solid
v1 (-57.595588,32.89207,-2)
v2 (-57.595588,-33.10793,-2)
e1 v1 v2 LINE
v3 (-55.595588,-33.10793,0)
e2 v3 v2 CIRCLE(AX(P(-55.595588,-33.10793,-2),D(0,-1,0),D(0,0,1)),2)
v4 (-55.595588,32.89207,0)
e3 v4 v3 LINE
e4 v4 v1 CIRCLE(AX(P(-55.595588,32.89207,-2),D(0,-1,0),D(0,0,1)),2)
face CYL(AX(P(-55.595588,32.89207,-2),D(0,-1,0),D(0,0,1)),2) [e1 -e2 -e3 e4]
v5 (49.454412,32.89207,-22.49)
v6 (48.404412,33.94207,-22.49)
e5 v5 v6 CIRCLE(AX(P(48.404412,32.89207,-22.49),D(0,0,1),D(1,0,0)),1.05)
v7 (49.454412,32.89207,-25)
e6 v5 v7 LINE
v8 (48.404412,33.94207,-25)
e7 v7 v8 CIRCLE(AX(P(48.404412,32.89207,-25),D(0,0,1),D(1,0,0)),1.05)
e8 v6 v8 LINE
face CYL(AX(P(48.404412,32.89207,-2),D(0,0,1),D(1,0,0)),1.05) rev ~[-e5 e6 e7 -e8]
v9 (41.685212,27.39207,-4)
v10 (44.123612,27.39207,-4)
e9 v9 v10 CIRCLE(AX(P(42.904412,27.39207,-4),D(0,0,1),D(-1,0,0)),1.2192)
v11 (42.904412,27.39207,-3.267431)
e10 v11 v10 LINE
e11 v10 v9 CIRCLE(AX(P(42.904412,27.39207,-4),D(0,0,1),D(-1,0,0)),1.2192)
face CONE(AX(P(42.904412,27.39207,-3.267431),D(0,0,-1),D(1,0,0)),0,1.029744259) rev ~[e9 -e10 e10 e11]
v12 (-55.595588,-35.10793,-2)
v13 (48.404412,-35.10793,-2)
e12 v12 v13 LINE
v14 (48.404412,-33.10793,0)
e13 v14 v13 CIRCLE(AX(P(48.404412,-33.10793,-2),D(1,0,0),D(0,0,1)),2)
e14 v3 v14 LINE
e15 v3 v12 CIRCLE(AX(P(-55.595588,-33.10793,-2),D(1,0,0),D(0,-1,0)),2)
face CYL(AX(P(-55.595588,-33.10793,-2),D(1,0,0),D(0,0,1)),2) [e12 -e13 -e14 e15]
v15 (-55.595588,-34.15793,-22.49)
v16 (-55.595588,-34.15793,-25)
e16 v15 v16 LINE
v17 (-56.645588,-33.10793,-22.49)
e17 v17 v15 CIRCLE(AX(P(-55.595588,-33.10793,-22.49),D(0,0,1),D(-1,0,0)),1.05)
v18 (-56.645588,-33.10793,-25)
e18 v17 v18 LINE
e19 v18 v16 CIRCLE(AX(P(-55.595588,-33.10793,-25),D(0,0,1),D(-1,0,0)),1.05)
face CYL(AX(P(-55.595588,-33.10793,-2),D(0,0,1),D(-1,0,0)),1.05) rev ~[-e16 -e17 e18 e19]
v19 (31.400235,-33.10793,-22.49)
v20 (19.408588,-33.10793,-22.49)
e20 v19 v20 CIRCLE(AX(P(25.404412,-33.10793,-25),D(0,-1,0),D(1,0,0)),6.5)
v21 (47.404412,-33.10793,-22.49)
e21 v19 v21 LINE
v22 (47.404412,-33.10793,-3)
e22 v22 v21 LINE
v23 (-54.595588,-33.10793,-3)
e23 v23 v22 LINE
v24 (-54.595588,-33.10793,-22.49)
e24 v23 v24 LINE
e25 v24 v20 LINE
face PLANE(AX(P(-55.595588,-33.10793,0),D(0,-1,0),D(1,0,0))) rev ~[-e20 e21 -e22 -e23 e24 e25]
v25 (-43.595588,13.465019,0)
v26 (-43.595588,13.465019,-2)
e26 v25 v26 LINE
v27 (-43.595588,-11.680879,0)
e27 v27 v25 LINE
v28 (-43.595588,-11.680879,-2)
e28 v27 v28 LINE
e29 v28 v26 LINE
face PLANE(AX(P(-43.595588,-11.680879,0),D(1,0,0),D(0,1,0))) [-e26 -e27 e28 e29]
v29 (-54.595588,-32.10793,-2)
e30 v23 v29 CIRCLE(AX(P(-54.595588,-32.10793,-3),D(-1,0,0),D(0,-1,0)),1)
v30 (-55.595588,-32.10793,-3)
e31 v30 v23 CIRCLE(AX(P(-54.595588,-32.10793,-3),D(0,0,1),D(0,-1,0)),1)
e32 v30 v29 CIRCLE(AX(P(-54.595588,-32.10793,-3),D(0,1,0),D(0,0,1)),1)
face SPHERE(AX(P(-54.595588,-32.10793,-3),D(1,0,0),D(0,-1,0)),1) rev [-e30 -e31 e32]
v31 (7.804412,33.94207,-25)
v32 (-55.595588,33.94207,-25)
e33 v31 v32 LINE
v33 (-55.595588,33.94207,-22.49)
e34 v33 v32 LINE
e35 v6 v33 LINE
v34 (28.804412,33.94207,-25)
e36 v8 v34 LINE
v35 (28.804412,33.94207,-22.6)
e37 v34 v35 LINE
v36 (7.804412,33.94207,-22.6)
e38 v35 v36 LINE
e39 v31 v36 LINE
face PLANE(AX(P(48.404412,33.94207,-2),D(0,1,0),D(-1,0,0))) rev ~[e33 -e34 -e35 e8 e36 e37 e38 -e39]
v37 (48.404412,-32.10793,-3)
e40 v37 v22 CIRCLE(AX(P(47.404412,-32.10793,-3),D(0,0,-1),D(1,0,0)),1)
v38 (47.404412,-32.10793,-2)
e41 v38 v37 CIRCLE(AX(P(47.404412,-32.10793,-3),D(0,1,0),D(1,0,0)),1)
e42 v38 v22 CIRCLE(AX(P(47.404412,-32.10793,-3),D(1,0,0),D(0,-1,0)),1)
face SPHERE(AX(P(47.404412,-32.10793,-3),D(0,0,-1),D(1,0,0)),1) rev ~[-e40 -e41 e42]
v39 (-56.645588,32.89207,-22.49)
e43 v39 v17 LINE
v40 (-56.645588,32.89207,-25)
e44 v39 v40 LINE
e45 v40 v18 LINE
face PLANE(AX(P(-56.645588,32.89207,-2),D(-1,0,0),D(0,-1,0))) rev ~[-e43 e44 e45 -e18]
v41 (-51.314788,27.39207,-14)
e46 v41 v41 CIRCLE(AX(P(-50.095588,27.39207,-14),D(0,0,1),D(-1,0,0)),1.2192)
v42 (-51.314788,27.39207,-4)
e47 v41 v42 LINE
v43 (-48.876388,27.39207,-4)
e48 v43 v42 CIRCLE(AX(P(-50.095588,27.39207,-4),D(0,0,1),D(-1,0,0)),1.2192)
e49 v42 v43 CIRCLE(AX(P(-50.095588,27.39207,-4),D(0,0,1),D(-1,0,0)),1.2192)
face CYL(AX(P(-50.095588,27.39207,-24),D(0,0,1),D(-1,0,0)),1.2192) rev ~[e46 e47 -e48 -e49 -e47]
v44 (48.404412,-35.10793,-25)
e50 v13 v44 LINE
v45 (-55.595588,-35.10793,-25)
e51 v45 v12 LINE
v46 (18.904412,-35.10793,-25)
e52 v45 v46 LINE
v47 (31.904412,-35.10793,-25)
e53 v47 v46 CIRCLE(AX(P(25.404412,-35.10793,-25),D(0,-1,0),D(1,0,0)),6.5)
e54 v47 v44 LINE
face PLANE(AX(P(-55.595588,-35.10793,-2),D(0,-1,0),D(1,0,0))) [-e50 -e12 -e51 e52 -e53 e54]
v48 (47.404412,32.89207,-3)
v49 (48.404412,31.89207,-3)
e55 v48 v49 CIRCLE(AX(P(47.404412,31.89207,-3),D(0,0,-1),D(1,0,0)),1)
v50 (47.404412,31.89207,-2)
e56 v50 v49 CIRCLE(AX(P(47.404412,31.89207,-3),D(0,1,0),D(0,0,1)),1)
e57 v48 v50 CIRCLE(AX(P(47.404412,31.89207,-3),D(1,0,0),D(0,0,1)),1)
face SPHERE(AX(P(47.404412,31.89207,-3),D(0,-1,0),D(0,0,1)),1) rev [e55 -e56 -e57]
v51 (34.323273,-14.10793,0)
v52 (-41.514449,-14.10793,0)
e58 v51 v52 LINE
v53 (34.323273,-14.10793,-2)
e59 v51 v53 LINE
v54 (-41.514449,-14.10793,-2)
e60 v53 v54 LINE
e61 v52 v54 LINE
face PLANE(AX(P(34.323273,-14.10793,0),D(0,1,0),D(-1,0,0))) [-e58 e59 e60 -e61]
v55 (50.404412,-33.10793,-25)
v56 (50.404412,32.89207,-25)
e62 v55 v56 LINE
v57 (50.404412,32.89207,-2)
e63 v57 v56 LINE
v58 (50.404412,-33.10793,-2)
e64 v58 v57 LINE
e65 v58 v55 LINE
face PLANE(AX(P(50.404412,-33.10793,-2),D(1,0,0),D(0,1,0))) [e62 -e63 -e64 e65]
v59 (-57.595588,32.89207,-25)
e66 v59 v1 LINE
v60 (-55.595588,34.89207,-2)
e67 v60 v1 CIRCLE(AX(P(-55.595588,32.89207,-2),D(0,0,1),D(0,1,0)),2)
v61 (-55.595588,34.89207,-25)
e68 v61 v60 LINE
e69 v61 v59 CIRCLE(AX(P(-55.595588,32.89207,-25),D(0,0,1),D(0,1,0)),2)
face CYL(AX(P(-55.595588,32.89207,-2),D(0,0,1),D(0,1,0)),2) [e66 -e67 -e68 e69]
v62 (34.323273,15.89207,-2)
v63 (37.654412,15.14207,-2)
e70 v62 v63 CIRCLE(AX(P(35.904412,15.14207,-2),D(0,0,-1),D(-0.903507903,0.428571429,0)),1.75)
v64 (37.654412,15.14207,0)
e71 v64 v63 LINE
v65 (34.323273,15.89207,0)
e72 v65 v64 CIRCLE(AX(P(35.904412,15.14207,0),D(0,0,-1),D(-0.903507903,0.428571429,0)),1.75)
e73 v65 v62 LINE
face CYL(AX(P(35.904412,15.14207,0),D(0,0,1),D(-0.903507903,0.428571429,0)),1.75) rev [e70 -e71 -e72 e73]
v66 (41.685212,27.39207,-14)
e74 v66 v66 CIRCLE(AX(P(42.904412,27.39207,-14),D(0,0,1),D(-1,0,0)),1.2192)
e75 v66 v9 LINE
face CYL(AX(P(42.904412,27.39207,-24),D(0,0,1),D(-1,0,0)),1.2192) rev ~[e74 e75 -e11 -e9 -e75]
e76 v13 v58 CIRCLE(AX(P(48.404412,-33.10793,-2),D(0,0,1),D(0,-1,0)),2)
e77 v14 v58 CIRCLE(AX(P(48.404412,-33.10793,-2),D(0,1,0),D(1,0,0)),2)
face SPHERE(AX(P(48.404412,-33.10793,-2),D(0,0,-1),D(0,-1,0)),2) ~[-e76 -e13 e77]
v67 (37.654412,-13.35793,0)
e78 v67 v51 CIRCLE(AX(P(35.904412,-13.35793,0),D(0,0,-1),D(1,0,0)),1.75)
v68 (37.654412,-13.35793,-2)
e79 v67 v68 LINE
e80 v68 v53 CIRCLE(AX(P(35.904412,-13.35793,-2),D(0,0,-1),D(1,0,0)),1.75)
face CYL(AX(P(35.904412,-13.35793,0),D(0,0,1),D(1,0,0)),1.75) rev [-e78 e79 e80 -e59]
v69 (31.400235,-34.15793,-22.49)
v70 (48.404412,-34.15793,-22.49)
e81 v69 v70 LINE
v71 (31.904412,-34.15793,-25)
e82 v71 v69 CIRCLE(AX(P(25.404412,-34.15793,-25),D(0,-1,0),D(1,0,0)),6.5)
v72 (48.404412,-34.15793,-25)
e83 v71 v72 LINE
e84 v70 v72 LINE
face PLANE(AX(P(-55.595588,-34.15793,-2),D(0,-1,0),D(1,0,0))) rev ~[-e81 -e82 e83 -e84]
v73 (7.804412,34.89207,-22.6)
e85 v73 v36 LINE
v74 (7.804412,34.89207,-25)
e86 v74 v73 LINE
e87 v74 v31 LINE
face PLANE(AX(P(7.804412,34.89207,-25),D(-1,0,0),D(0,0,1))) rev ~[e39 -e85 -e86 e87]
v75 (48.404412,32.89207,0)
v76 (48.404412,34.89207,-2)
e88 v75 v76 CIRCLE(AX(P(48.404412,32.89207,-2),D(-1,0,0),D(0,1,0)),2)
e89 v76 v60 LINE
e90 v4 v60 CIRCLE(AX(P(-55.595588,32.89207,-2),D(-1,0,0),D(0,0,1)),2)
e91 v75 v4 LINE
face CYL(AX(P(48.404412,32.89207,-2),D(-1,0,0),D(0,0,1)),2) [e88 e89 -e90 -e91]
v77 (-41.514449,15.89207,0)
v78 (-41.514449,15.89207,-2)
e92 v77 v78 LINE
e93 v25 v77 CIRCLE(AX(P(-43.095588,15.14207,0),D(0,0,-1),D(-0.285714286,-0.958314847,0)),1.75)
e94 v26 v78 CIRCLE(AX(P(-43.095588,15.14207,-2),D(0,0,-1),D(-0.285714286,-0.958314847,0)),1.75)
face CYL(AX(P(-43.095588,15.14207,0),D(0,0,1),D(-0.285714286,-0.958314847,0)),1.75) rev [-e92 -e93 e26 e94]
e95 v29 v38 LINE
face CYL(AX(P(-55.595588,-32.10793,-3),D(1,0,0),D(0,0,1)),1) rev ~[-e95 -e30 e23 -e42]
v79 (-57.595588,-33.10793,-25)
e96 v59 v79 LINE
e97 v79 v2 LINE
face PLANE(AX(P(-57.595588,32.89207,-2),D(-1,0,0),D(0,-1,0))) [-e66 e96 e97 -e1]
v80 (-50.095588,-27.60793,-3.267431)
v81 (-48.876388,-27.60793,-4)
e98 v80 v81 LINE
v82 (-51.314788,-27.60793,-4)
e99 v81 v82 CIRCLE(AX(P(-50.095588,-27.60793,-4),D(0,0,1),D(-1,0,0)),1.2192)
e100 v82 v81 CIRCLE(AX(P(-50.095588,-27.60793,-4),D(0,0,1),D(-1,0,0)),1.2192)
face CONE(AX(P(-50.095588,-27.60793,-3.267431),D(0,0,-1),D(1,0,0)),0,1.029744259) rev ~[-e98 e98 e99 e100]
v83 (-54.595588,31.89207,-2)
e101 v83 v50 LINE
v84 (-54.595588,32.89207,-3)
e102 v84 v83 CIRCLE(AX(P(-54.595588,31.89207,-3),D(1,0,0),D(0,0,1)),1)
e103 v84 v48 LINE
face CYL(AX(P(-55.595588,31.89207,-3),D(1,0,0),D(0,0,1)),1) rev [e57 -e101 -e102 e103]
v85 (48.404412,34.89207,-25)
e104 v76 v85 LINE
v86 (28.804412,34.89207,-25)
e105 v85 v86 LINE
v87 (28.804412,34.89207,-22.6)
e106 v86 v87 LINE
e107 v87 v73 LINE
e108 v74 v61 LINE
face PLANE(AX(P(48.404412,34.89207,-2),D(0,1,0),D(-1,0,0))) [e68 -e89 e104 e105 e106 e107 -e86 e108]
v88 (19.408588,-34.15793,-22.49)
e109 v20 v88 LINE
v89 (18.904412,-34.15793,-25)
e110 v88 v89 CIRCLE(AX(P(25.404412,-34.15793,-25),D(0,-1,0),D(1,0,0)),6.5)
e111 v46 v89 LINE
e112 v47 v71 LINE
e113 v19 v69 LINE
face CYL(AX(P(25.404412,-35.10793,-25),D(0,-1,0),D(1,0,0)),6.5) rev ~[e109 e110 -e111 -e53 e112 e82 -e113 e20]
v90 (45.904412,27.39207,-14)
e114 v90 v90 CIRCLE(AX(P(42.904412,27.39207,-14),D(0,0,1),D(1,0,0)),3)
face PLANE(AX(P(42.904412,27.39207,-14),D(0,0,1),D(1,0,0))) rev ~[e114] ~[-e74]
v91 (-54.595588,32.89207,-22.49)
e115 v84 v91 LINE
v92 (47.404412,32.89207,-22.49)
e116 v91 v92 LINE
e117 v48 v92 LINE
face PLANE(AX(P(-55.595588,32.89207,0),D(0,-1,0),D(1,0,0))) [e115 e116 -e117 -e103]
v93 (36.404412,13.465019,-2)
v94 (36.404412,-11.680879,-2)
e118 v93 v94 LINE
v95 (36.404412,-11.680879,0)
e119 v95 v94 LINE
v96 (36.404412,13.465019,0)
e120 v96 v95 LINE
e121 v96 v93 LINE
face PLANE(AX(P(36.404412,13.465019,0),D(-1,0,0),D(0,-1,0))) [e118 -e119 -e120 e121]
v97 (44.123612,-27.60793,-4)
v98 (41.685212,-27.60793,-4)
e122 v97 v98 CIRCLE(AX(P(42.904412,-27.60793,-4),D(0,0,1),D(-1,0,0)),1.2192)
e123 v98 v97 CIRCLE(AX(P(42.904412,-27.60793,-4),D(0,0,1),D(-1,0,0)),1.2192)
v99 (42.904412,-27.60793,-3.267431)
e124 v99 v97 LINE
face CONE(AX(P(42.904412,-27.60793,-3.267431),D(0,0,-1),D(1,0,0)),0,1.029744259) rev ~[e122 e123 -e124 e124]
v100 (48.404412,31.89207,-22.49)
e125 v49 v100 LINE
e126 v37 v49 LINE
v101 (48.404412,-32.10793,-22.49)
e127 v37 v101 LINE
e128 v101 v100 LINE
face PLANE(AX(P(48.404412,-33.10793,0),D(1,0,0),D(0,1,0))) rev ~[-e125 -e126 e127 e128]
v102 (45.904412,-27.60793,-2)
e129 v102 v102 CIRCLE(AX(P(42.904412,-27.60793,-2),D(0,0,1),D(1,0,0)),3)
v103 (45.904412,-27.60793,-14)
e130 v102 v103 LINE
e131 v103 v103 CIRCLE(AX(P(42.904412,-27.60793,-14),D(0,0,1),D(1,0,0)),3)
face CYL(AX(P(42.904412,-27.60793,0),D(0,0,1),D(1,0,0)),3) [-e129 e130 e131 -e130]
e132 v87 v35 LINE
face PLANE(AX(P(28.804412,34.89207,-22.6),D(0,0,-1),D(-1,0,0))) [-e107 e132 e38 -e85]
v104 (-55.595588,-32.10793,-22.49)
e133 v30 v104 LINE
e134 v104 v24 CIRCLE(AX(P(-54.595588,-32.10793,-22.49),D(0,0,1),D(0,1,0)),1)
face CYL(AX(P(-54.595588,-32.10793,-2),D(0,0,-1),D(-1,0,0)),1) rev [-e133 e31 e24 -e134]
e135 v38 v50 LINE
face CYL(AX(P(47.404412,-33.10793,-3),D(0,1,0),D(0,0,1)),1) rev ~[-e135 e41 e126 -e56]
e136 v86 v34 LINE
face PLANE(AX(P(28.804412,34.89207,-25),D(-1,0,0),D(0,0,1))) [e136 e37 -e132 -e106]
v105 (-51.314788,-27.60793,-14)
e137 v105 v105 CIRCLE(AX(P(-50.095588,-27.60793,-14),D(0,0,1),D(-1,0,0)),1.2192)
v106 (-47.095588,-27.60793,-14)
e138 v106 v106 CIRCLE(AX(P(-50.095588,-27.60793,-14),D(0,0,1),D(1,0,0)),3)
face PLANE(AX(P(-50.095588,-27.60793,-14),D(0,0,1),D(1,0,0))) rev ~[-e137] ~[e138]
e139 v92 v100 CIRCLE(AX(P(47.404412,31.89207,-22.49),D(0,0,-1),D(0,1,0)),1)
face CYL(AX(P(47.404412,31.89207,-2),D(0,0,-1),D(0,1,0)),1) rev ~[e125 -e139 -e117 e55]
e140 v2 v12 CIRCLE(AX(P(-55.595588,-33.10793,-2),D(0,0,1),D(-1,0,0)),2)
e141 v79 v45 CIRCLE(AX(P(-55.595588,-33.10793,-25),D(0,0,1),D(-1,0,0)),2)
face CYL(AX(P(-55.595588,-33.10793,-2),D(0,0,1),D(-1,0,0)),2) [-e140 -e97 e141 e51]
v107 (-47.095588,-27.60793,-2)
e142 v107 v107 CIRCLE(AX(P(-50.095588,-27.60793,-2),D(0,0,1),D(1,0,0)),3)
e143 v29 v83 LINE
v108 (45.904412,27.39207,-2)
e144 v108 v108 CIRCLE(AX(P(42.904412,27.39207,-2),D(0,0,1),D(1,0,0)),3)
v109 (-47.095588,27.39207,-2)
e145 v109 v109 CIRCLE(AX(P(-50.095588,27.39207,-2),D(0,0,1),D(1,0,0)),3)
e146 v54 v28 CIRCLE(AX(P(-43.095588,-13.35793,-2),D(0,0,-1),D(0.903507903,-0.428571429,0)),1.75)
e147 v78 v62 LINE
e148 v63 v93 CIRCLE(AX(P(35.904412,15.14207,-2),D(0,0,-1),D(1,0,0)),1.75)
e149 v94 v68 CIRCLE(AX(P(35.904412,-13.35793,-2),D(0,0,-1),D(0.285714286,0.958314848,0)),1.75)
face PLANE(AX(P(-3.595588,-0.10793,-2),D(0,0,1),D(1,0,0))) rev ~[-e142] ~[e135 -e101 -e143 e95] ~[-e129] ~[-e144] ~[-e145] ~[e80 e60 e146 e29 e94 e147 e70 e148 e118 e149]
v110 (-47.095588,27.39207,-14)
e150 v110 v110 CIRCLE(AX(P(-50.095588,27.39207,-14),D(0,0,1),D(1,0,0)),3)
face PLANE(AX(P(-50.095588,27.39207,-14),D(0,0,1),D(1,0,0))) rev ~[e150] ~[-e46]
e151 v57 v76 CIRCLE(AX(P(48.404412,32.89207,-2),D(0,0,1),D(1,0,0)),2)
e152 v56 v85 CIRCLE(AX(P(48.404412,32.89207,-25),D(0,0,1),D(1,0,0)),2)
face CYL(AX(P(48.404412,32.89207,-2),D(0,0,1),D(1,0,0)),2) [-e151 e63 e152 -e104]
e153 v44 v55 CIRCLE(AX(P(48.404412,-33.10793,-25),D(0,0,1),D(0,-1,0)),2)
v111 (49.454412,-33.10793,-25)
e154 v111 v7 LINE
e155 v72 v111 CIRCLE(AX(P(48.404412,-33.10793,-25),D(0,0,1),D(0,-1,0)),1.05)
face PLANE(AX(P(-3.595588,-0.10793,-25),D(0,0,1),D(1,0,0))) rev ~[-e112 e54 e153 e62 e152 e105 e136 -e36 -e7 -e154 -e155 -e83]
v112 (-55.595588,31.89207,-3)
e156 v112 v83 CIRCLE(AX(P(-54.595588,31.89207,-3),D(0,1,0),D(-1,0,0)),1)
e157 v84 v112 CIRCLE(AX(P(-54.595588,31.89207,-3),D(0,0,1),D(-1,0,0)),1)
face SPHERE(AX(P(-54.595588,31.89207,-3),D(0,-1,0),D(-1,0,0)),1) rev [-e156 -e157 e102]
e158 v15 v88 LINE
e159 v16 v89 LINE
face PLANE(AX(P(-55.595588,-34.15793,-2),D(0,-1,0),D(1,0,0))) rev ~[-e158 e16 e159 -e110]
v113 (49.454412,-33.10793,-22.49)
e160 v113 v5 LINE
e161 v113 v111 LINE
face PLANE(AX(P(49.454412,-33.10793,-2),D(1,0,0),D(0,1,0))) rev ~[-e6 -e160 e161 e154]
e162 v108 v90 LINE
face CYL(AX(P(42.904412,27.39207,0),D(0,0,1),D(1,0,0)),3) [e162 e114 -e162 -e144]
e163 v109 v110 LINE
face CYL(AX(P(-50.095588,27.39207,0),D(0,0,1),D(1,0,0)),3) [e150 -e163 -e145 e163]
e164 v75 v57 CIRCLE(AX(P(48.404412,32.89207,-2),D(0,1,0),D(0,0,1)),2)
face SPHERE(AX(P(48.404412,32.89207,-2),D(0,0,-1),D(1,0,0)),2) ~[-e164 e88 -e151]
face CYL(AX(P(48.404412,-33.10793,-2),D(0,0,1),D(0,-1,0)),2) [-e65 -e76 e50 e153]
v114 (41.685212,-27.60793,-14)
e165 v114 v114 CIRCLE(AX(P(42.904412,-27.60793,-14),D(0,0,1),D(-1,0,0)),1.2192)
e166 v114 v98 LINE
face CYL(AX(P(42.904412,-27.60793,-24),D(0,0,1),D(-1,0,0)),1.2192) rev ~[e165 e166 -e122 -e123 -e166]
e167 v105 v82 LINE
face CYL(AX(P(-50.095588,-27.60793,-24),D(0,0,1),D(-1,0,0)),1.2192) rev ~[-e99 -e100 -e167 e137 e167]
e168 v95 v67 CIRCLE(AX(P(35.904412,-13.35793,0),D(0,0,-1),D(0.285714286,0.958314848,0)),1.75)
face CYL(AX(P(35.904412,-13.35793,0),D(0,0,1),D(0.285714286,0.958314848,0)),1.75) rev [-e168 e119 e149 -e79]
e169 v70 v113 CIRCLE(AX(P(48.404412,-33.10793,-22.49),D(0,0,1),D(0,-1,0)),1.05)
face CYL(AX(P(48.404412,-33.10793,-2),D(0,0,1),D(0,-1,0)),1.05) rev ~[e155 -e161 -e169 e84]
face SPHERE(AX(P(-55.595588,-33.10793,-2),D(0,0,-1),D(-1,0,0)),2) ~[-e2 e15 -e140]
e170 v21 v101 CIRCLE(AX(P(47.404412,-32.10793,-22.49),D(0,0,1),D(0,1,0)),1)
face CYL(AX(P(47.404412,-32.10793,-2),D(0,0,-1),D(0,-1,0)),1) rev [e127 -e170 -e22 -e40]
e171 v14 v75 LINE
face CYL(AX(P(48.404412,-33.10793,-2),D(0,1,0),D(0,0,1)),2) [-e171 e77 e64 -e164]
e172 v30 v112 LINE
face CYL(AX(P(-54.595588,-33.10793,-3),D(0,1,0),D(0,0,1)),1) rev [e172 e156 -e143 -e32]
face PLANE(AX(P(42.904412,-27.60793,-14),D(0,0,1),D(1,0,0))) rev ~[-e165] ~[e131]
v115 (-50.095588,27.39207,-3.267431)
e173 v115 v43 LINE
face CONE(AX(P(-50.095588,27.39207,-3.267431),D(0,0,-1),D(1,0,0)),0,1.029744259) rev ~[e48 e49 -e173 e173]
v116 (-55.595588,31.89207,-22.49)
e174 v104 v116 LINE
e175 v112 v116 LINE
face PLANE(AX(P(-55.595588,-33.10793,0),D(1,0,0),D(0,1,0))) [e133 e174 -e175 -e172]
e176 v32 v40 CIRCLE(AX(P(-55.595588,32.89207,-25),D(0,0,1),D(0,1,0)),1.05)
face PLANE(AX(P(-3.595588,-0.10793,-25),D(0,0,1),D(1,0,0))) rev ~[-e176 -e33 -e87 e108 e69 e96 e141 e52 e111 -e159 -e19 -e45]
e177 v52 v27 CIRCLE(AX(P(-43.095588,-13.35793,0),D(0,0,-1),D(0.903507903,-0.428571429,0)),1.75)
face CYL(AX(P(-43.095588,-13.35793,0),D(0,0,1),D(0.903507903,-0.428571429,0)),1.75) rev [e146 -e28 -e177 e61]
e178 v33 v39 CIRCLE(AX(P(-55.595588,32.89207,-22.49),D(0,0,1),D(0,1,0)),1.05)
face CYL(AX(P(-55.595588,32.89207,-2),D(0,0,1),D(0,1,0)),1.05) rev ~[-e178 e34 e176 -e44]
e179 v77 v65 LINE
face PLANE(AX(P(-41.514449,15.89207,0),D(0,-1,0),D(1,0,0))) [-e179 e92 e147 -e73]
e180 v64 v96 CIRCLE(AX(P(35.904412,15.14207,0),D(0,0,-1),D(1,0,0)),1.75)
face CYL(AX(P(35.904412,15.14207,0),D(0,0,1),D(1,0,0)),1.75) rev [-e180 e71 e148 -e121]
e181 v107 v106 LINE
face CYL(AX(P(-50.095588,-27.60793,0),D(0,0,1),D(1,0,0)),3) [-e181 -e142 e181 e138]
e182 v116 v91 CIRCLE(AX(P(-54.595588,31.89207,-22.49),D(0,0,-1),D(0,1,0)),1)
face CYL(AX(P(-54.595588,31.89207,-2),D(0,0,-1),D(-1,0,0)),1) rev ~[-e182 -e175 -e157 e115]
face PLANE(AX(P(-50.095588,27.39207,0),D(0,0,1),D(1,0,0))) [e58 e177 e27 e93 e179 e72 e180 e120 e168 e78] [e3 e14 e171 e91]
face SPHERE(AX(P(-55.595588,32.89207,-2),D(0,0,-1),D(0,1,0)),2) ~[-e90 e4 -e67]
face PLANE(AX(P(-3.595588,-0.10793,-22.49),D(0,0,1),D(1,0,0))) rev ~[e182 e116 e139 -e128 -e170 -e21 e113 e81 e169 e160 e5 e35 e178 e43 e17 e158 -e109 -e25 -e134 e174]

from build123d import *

# Parameters (mm, degrees)
F0_W      = 104
F0_H      = 66
F0_R      = 3
F1_DEPTH  = 2
F2_DEPTH  = 22.49
F3_DEPTH  = 23
F4_DEPTH  = 14
F6_DEPTH  = 2.5
F7_W      = 21
F7_H      = 2.4
F8_DEPTH  = 2.5
F10_D     = 2.4384
F10_DEPTH = 10
F10_TIP   = 0.7325692667
F11_R     = 2
F12_R     = 1


with BuildPart() as f1:
    # F0 (on Top) → F1 (new body)
    with BuildSketch(Plane.XY):
        with BuildLine():
            Line((48.4044117422, 34.8920698583), (-55.5955882578, 34.8920698583))
            ThreePointArc((-55.5955882578, 34.8920698583), (-57.0098018202, 34.3062834207), (-57.5955882578, 32.8920698583))
            Line((-57.5955882578, 32.8920698583), (-57.5955882578, -33.1079301417))
            ThreePointArc((-57.5955882578, -33.1079301417), (-57.0098018202, -34.5221437041), (-55.5955882578, -35.1079301417))
            Line((-55.5955882578, -35.1079301417), (48.4044117422, -35.1079301417))
            ThreePointArc((48.4044117422, -35.1079301417), (49.8186253046, -34.5221437041), (50.4044117422, -33.1079301417))
            Line((50.4044117422, -33.1079301417), (50.4044117422, 32.8920698583))
            ThreePointArc((50.4044117422, 32.8920698583), (49.8186253046, 34.3062834207), (48.4044117422, 34.8920698583))
        make_face()
        with BuildLine():
            ThreePointArc((-56.6455882578, 32.8920698583), (-56.338050378, 33.6345319786), (-55.5955882578, 33.9420698583))
            Line((-55.5955882578, 33.9420698583), (48.4044117422, 33.9420698583))
            ThreePointArc((48.4044117422, 33.9420698583), (49.1468738625, 33.6345319786), (49.4544117422, 32.8920698583))
            Line((49.4544117422, 32.8920698583), (49.4544117422, -33.1079301417))
            ThreePointArc((49.4544117422, -33.1079301417), (49.1468738625, -33.8503922619), (48.4044117422, -34.1579301417))
            Line((48.4044117422, -34.1579301417), (-55.5955882578, -34.1579301417))
            ThreePointArc((-55.5955882578, -34.1579301417), (-56.338050378, -33.8503922619), (-56.6455882578, -33.1079301417))
            Line((-56.6455882578, -33.1079301417), (-56.6455882578, 32.8920698583))
        make_face(mode=Mode.SUBTRACT)
        with BuildLine():
            Line((48.4044117422, 33.9420698583), (-55.5955882578, 33.9420698583))
            ThreePointArc((-55.5955882578, 33.9420698583), (-56.338050378, 33.6345319786), (-56.6455882578, 32.8920698583))
            Line((-56.6455882578, 32.8920698583), (-56.6455882578, -33.1079301417))
            ThreePointArc((-56.6455882578, -33.1079301417), (-56.338050378, -33.8503922619), (-55.5955882578, -34.1579301417))
            Line((-55.5955882578, -34.1579301417), (48.4044117422, -34.1579301417))
            ThreePointArc((48.4044117422, -34.1579301417), (49.1468738625, -33.8503922619), (49.4544117422, -33.1079301417))
            Line((49.4544117422, -33.1079301417), (49.4544117422, 32.8920698583))
            ThreePointArc((49.4544117422, 32.8920698583), (49.1468738625, 33.6345319786), (48.4044117422, 33.9420698583))
        make_face()
        with Locations((-3.5955882578, -0.1079301417)):
            Rectangle(F0_W, F0_H, mode=Mode.SUBTRACT)
        with Locations((-3.5955882578, -0.1079301417)):
            Rectangle(F0_W, F0_H)
        with Locations((-50.0955882578, -27.6079301417)):
            Circle(F0_R, mode=Mode.SUBTRACT)
        with Locations((42.9044117422, -27.6079301417)):
            Circle(F0_R, mode=Mode.SUBTRACT)
        with Locations((-50.0955882578, 27.3920698583)):
            Circle(F0_R, mode=Mode.SUBTRACT)
        with BuildLine():
            ThreePointArc((-43.5955882578, 13.4650188752), (-44.424068371, 16.2812101433), (-41.5144494277, 15.8920698583))
            Line((-41.5144494277, 15.8920698583), (34.3232729121, 15.8920698583))
            ThreePointArc((34.3232729121, 15.8920698583), (36.2887989476, 16.8493327192), (37.6544117422, 15.1420698583))
            ThreePointArc((37.6544117422, 15.1420698583), (37.3075332623, 14.0962448251), (36.4044117422, 13.4650188752))
            Line((36.4044117422, 13.4650188752), (36.4044117422, -11.6808791586))
            ThreePointArc((36.4044117422, -11.6808791586), (37.3075332623, -12.3121051085), (37.6544117422, -13.3579301417))
            ThreePointArc((37.6544117422, -13.3579301417), (36.2887989476, -15.0651930026), (34.3232729121, -14.1079301417))
            Line((34.3232729121, -14.1079301417), (-41.5144494277, -14.1079301417))
            ThreePointArc((-41.5144494277, -14.1079301417), (-44.424068371, -14.4970704267), (-43.5955882578, -11.6808791586))
            Line((-43.5955882578, -11.6808791586), (-43.5955882578, 13.4650188752))
        make_face(mode=Mode.SUBTRACT)
        with Locations((42.9044117422, 27.3920698583)):
            Circle(F0_R, mode=Mode.SUBTRACT)
        with Locations((-50.0955882578, 27.3920698583)):
            Circle(F0_R)
        with Locations((42.9044117422, 27.3920698583)):
            Circle(F0_R)
        with Locations((42.9044117422, -27.6079301417)):
            Circle(F0_R)
        with Locations((-50.0955882578, -27.6079301417)):
            Circle(F0_R)
    extrude(amount=-F1_DEPTH)

    # F0 (on Top) → F2 (join)
    with BuildSketch(Plane.XY):
        with BuildLine():
            Line((48.4044117422, 33.9420698583), (-55.5955882578, 33.9420698583))
            ThreePointArc((-55.5955882578, 33.9420698583), (-56.338050378, 33.6345319786), (-56.6455882578, 32.8920698583))
            Line((-56.6455882578, 32.8920698583), (-56.6455882578, -33.1079301417))
            ThreePointArc((-56.6455882578, -33.1079301417), (-56.338050378, -33.8503922619), (-55.5955882578, -34.1579301417))
            Line((-55.5955882578, -34.1579301417), (48.4044117422, -34.1579301417))
            ThreePointArc((48.4044117422, -34.1579301417), (49.1468738625, -33.8503922619), (49.4544117422, -33.1079301417))
            Line((49.4544117422, -33.1079301417), (49.4544117422, 32.8920698583))
            ThreePointArc((49.4544117422, 32.8920698583), (49.1468738625, 33.6345319786), (48.4044117422, 33.9420698583))
        make_face()
        with Locations((-3.5955882578, -0.1079301417)):
            Rectangle(F0_W, F0_H, mode=Mode.SUBTRACT)
    extrude(amount=-F2_DEPTH)

    # F3 (add): a face of the model
    f3_faces = [f1.faces().sort_by_distance(p)[0] for p in [
        (-3.5955882578, 34.763368654, -2),
    ]]
    extrude(f3_faces, amount=F3_DEPTH)

    # F0 (on Top) → F4 (join)
    with BuildSketch(Plane.XY):
        with Locations((-50.0955882578, 27.3920698583)):
            Circle(F0_R)
        with Locations((42.9044117422, 27.3920698583)):
            Circle(F0_R)
        with Locations((-50.0955882578, -27.6079301417)):
            Circle(F0_R)
        with Locations((42.9044117422, -27.6079301417)):
            Circle(F0_R)
    extrude(amount=-F4_DEPTH)

    # F5 (on face) → F6 (cut)
    with BuildSketch(Plane.XZ.offset(35.1079301417)):
        with BuildLine():
            Line((18.9044117422, -25), (31.9044117422, -25))
            ThreePointArc((31.9044117422, -25), (25.4044117422, -18.5), (18.9044117422, -25))
        make_face()
    extrude(amount=-F6_DEPTH, mode=Mode.SUBTRACT)

    # F7 (on face) → F8 (cut)
    with BuildSketch(Plane(origin=(0, 34.8920698583, 0), x_dir=(-1, 0, 0), z_dir=(0, 1, 0))):
        with Locations((-18.3044117422, -23.8)):
            Rectangle(F7_W, F7_H)
    extrude(amount=-F8_DEPTH, mode=Mode.SUBTRACT)

    # F10
    with Locations(Plane(origin=(0, 0, -14), x_dir=(1, 0, 0), z_dir=(0, 0, -1))):
        with Locations((-50.0955882578, -27.3920698583), (42.9044117422, -27.3920698583), (42.9044117422, 27.6079301417), (-50.0955882578, 27.6079301417)):
            Hole(F10_D / 2, depth=F10_DEPTH)
            with Locations((0, 0, -(F10_DEPTH + F10_TIP / 2))):  # 118° drill point
                Cone(0, F10_D / 2, F10_TIP, mode=Mode.SUBTRACT)

    # F11
    f11_edges = [f1.edges().sort_by_distance(p)[0] for p in [
        (-57.595588, -0.10793, 0),
        (-3.595588, 34.89207, 0),
        (50.404412, -0.10793, 0),
        (-3.595588, -35.10793, 0),
        (-57.009802, 34.306283, 0),
        (-57.009802, -34.522144, 0),
        (49.818625, -34.522144, 0),
        (49.818625, 34.306283, 0),
    ]]
    fillet(f11_edges, radius=F11_R)

    # F12
    f12_edges = [f1.edges().sort_by_distance(p)[0] for p in [
        (48.404412, -33.10793, -12.245),
        (48.404412, -0.10793, -2),
        (-3.595588, -33.10793, -2),
        (-55.595588, -33.10793, -12.245),
        (-55.595588, -0.10793, -2),
        (-55.595588, 32.89207, -12.245),
        (-3.595588, 32.89207, -2),
        (48.404412, 32.89207, -12.245),
    ]]
    fillet(f12_edges, radius=F12_R)


solid = f1.part
